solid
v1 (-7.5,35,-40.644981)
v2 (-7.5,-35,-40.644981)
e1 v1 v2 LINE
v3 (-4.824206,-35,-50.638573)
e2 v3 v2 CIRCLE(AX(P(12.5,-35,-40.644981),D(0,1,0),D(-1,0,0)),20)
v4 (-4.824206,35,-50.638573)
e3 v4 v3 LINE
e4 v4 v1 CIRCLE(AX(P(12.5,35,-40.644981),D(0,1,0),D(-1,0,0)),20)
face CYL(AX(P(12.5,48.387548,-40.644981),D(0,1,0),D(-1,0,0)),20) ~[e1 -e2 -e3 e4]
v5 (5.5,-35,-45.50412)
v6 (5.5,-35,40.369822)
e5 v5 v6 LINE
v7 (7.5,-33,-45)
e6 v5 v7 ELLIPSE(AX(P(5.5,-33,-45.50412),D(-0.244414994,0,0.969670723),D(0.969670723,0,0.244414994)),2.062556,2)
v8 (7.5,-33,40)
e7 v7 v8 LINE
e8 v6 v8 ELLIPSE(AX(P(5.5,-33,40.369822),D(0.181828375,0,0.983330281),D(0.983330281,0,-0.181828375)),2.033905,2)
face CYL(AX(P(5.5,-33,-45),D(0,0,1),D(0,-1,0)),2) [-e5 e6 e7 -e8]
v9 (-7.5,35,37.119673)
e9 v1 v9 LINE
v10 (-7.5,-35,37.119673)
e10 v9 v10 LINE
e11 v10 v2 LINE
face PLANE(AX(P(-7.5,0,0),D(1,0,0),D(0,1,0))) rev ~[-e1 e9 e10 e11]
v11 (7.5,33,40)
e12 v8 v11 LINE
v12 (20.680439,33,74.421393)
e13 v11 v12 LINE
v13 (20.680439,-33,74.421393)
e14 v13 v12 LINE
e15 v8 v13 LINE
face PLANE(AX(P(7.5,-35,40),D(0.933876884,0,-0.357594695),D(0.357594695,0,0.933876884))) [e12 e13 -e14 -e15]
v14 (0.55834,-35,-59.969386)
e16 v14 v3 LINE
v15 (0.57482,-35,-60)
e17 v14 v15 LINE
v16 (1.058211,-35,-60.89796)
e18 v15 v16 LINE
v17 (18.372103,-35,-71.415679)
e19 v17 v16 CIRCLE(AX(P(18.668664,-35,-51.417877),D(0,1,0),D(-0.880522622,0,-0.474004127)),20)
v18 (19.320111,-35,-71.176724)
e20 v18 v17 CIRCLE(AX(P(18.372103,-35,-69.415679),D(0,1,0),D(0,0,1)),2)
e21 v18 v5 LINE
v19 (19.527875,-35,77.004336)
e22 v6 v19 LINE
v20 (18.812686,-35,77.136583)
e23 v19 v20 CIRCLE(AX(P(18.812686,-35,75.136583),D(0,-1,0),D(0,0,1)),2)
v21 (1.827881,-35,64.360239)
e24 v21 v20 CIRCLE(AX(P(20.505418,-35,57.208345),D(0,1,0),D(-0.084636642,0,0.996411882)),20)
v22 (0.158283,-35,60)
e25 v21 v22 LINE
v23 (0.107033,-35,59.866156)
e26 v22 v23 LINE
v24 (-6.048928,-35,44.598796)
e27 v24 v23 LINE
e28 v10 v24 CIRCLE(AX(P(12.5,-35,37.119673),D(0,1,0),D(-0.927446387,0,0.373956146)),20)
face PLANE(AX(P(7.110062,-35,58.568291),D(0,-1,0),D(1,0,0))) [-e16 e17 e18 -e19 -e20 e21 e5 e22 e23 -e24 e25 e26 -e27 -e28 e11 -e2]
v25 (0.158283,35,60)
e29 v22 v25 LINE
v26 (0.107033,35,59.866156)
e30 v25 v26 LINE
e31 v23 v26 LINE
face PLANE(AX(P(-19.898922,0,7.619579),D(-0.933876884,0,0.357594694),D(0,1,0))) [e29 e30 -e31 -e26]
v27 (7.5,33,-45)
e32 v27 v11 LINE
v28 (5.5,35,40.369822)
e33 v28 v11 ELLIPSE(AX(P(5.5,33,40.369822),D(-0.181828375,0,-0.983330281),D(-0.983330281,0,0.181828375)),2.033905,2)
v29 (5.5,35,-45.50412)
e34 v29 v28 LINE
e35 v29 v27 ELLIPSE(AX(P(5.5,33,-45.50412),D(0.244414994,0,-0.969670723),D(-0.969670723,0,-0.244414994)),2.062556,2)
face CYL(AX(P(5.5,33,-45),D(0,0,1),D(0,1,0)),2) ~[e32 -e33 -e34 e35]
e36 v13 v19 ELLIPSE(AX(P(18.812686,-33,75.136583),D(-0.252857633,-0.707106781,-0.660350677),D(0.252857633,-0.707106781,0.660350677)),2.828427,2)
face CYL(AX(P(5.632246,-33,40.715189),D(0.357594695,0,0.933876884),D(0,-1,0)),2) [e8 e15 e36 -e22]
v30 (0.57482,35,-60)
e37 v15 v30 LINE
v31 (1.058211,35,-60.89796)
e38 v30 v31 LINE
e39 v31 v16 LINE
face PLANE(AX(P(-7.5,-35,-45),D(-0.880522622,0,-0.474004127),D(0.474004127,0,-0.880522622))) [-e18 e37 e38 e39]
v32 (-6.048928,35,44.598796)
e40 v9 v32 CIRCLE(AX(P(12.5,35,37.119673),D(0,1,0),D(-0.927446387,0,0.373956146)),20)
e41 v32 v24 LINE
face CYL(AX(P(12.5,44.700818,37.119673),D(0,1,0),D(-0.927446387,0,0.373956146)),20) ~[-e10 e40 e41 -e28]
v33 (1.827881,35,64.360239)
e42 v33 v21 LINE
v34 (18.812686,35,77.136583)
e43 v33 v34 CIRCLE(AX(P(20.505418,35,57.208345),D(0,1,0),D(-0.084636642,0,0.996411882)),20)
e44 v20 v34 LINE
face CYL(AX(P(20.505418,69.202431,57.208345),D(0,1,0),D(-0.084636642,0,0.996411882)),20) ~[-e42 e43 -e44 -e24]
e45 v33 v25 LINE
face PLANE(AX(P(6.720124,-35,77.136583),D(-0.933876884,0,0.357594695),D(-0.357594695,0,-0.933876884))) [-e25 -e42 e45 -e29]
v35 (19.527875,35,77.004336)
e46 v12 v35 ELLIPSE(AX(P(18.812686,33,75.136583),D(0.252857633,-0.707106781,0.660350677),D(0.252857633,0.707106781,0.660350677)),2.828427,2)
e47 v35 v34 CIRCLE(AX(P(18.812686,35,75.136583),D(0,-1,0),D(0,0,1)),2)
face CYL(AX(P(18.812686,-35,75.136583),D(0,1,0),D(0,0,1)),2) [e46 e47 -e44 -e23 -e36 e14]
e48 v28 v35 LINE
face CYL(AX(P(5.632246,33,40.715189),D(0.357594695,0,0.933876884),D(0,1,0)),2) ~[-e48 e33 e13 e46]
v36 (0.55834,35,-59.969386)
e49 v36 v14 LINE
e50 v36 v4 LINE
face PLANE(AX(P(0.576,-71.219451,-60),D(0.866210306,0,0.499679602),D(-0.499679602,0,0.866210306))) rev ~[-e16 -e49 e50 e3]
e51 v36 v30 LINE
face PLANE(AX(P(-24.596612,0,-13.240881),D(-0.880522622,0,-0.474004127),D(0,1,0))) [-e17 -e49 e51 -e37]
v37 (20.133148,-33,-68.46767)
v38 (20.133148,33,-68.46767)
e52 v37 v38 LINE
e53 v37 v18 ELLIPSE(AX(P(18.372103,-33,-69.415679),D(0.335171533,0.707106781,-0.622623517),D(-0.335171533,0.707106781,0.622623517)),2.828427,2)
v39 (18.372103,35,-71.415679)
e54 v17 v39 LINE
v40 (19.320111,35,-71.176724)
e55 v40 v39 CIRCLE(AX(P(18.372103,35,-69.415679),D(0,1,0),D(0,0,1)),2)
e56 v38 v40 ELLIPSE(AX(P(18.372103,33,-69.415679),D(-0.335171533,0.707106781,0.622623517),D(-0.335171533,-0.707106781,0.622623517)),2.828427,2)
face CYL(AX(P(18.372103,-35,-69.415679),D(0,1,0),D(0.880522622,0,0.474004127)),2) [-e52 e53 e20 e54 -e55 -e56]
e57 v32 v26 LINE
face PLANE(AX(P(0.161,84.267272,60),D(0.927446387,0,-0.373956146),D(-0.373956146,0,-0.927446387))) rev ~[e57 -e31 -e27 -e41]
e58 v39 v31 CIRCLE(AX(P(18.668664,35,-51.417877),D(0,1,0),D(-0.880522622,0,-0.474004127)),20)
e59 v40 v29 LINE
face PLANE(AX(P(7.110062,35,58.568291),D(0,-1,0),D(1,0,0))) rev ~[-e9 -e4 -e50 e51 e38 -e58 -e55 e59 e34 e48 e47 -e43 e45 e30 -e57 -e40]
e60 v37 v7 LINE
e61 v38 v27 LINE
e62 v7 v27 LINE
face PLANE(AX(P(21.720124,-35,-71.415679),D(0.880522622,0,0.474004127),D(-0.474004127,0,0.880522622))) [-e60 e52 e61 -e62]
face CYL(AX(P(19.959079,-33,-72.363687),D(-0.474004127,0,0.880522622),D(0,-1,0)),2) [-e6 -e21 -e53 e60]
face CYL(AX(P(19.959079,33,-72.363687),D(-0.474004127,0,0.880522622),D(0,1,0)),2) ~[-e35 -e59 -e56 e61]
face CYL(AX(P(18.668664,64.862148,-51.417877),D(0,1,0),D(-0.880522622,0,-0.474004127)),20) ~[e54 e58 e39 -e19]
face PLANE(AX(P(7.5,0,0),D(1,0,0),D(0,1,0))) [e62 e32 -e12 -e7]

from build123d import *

# Parameters (mm, degrees)
F0_W        = 70
F0_H        = 120
F1_DEPTH    = 7.5
F3_DEPTH    = 70
F4_T4_DEPTH = 168.5345436458
F5_T4_DEPTH = 142.4389014281
F6_R        = 2
F7_T1_DEPTH = 89.4016367136
F7_T3_DEPTH = 96.7750960728
F7_T5_DEPTH = 138.4048613392
F7_T7_DEPTH = 129.7242953335


# Not quite as in the source:
# - a fillet or chamfer that OpenCascade refuses, or shapes differently, is made with other operations: its cross-section is extruded or revolved along the edge and cut away or added


with BuildPart() as f1:
    # F0 (on Right) → F1 (new body, symmetric)
    with BuildSketch(Plane.YZ):
        Rectangle(F0_W, F0_H)
    extrude(amount=F1_DEPTH, both=True)

    # F2 (on face) → F3 (join)
    with BuildSketch(Plane.XZ.offset(35)):
        Polygon((6.7201238232, 77.1365826446), (-7.5, 40), (7.5, 40), (21.7201238232, 77.1365826446), align=None)
        Polygon((7.5, -45), (-7.5, -45), (6.7201238232, -71.4156786483), (21.7201238232, -71.4156786483), align=None)
    extrude(amount=-F3_DEPTH)

    # F4: chamfer of 19 x 7.661 on 1 edges, made by hand


with BuildPart() as f4_tool2:
    # F4_s3 → F4_t4 (new body)
    with BuildSketch(Plane.XZ.offset(-84.2672718229)):
        Polygon((0.161, 60), (-7.5, 41), (-7.5, 60), align=None)
    extrude(amount=F4_T4_DEPTH)

    split(bisect_by=Plane(origin=(-19.8989220202, 0, 7.6195792646), x_dir=(0, 1, 0), z_dir=(-0.933876884, 0, 0.3575946945)), keep=Keep.TOP)


with BuildPart() as f1_1:
    add(f1.part)

    # F4_t1: cut F4_tool2
    add(f4_tool2.part, mode=Mode.SUBTRACT)

    # F5: chamfer of 8.076 x 14 on 1 edges, made by hand


with BuildPart() as f5_tool2:
    # F5_s3 → F5_t4 (new body)
    with BuildSketch(Plane.XZ.offset(71.219450714)):
        Polygon((0.576, -60), (-7.5, -46), (-7.5, -60), align=None)
    extrude(amount=-F5_T4_DEPTH)

    split(bisect_by=Plane(origin=(-24.5966117165, 0, -13.2408812545), x_dir=(0, 1, 0), z_dir=(-0.8805226216, 0, -0.4740041274)), keep=Keep.TOP)


with BuildPart() as f1_2:
    add(f1_1.part)

    # F5_t1: cut F5_tool2
    add(f5_tool2.part, mode=Mode.SUBTRACT)

    # F6
    f6_edges = [f1_2.edges().sort_by_distance(p)[0] for p in [
        (14.610062, -35, 58.568291),
        (7.5, -35, -2.5),
        (14.610062, -35, -58.207839),
        (14.610062, 35, -58.207839),
        (7.5, 35, -2.5),
        (14.610062, 35, 58.568291),
        (21.720124, 0, 77.136583),
        (21.720124, 0, -71.415679),
    ]]
    fillet(f6_edges, radius=F6_R)

    # F7: fillet of radius 20 on 4 edges, made by hand

    # F7_s2 → F7_t1 (cut)
    with BuildSketch(Plane.XZ.offset(-44.7008183568)):
        with BuildLine():
            ThreePointArc((-6.0489277422, 44.5987955748), (-7.1338808548, 40.9289668935), (-7.5, 37.1196726573))
            Line((-7.5, 37.1196726573), (-7.9, 37.1196726573))
            Line((-7.9, 37.1196726573), (-7.9, 41.0776065469))
            Line((-7.9, 41.0776065469), (-6.419906297, 44.7483780332))
            Line((-6.419906297, 44.7483780332), (-6.0489277422, 44.5987955748))
        make_face()
    extrude(amount=F7_T1_DEPTH, mode=Mode.SUBTRACT)

    # F7_s4 → F7_t3 (cut)
    with BuildSketch(Plane.XZ.offset(-48.3875480364)):
        with BuildLine():
            ThreePointArc((-7.5, -40.6449807854), (-6.8194736284, -45.8177884102), (-4.8242061277, -50.6385728345))
            Line((-4.8242061277, -50.6385728345), (-5.1706902503, -50.8384446755))
            Line((-5.1706902503, -50.8384446755), (-7.9, -46.1071003843))
            Line((-7.9, -46.1071003843), (-7.9, -40.6449807854))
            Line((-7.9, -40.6449807854), (-7.5, -40.6449807854))
        make_face()
    extrude(amount=F7_T3_DEPTH, mode=Mode.SUBTRACT)

    # F7_s6 → F7_t5 (cut)
    with BuildSketch(Plane.XZ.offset(-69.2024306696)):
        with BuildLine():
            ThreePointArc((18.8126855564, 77.1365826446), (8.4827015625, 73.1912821466), (1.8278807245, 64.3602388931))
            Line((1.8278807245, 64.3602388931), (1.4543299709, 64.5032767709))
            Line((1.4543299709, 64.5032767709), (6.3465730696, 77.2796205224))
            Line((6.3465730696, 77.2796205224), (6.7201238232, 77.5365826446))
            ThreePointArc((6.7201238232, 77.5365826446), (12.7664046898, 77.5365826446), (18.7788308995, 77.5351473974))
            Line((18.7788308995, 77.5351473974), (18.8126855564, 77.1365826446))
        make_face()
    extrude(amount=F7_T5_DEPTH, mode=Mode.SUBTRACT)

    # F7_s8 → F7_t7 (cut)
    with BuildSketch(Plane.XZ.offset(-64.8621476667)):
        with BuildLine():
            ThreePointArc((1.0582113239, -60.8979600281), (8.2849802368, -68.5111251687), (18.3721027929, -71.4156786483))
            Line((18.3721027929, -71.4156786483), (18.3661715736, -71.8156346717))
            ThreePointArc((18.3661715736, -71.8156346717), (12.546113308, -71.8156786483), (6.7201238232, -71.8156786483))
            Line((6.7201238232, -71.8156786483), (6.3679147746, -71.6052802993))
            Line((6.3679147746, -71.6052802993), (0.7060022753, -61.0875616791))
            Line((0.7060022753, -61.0875616791), (1.0582113239, -60.8979600281))
        make_face()
    extrude(amount=F7_T7_DEPTH, mode=Mode.SUBTRACT)


solid = f1_2.part
